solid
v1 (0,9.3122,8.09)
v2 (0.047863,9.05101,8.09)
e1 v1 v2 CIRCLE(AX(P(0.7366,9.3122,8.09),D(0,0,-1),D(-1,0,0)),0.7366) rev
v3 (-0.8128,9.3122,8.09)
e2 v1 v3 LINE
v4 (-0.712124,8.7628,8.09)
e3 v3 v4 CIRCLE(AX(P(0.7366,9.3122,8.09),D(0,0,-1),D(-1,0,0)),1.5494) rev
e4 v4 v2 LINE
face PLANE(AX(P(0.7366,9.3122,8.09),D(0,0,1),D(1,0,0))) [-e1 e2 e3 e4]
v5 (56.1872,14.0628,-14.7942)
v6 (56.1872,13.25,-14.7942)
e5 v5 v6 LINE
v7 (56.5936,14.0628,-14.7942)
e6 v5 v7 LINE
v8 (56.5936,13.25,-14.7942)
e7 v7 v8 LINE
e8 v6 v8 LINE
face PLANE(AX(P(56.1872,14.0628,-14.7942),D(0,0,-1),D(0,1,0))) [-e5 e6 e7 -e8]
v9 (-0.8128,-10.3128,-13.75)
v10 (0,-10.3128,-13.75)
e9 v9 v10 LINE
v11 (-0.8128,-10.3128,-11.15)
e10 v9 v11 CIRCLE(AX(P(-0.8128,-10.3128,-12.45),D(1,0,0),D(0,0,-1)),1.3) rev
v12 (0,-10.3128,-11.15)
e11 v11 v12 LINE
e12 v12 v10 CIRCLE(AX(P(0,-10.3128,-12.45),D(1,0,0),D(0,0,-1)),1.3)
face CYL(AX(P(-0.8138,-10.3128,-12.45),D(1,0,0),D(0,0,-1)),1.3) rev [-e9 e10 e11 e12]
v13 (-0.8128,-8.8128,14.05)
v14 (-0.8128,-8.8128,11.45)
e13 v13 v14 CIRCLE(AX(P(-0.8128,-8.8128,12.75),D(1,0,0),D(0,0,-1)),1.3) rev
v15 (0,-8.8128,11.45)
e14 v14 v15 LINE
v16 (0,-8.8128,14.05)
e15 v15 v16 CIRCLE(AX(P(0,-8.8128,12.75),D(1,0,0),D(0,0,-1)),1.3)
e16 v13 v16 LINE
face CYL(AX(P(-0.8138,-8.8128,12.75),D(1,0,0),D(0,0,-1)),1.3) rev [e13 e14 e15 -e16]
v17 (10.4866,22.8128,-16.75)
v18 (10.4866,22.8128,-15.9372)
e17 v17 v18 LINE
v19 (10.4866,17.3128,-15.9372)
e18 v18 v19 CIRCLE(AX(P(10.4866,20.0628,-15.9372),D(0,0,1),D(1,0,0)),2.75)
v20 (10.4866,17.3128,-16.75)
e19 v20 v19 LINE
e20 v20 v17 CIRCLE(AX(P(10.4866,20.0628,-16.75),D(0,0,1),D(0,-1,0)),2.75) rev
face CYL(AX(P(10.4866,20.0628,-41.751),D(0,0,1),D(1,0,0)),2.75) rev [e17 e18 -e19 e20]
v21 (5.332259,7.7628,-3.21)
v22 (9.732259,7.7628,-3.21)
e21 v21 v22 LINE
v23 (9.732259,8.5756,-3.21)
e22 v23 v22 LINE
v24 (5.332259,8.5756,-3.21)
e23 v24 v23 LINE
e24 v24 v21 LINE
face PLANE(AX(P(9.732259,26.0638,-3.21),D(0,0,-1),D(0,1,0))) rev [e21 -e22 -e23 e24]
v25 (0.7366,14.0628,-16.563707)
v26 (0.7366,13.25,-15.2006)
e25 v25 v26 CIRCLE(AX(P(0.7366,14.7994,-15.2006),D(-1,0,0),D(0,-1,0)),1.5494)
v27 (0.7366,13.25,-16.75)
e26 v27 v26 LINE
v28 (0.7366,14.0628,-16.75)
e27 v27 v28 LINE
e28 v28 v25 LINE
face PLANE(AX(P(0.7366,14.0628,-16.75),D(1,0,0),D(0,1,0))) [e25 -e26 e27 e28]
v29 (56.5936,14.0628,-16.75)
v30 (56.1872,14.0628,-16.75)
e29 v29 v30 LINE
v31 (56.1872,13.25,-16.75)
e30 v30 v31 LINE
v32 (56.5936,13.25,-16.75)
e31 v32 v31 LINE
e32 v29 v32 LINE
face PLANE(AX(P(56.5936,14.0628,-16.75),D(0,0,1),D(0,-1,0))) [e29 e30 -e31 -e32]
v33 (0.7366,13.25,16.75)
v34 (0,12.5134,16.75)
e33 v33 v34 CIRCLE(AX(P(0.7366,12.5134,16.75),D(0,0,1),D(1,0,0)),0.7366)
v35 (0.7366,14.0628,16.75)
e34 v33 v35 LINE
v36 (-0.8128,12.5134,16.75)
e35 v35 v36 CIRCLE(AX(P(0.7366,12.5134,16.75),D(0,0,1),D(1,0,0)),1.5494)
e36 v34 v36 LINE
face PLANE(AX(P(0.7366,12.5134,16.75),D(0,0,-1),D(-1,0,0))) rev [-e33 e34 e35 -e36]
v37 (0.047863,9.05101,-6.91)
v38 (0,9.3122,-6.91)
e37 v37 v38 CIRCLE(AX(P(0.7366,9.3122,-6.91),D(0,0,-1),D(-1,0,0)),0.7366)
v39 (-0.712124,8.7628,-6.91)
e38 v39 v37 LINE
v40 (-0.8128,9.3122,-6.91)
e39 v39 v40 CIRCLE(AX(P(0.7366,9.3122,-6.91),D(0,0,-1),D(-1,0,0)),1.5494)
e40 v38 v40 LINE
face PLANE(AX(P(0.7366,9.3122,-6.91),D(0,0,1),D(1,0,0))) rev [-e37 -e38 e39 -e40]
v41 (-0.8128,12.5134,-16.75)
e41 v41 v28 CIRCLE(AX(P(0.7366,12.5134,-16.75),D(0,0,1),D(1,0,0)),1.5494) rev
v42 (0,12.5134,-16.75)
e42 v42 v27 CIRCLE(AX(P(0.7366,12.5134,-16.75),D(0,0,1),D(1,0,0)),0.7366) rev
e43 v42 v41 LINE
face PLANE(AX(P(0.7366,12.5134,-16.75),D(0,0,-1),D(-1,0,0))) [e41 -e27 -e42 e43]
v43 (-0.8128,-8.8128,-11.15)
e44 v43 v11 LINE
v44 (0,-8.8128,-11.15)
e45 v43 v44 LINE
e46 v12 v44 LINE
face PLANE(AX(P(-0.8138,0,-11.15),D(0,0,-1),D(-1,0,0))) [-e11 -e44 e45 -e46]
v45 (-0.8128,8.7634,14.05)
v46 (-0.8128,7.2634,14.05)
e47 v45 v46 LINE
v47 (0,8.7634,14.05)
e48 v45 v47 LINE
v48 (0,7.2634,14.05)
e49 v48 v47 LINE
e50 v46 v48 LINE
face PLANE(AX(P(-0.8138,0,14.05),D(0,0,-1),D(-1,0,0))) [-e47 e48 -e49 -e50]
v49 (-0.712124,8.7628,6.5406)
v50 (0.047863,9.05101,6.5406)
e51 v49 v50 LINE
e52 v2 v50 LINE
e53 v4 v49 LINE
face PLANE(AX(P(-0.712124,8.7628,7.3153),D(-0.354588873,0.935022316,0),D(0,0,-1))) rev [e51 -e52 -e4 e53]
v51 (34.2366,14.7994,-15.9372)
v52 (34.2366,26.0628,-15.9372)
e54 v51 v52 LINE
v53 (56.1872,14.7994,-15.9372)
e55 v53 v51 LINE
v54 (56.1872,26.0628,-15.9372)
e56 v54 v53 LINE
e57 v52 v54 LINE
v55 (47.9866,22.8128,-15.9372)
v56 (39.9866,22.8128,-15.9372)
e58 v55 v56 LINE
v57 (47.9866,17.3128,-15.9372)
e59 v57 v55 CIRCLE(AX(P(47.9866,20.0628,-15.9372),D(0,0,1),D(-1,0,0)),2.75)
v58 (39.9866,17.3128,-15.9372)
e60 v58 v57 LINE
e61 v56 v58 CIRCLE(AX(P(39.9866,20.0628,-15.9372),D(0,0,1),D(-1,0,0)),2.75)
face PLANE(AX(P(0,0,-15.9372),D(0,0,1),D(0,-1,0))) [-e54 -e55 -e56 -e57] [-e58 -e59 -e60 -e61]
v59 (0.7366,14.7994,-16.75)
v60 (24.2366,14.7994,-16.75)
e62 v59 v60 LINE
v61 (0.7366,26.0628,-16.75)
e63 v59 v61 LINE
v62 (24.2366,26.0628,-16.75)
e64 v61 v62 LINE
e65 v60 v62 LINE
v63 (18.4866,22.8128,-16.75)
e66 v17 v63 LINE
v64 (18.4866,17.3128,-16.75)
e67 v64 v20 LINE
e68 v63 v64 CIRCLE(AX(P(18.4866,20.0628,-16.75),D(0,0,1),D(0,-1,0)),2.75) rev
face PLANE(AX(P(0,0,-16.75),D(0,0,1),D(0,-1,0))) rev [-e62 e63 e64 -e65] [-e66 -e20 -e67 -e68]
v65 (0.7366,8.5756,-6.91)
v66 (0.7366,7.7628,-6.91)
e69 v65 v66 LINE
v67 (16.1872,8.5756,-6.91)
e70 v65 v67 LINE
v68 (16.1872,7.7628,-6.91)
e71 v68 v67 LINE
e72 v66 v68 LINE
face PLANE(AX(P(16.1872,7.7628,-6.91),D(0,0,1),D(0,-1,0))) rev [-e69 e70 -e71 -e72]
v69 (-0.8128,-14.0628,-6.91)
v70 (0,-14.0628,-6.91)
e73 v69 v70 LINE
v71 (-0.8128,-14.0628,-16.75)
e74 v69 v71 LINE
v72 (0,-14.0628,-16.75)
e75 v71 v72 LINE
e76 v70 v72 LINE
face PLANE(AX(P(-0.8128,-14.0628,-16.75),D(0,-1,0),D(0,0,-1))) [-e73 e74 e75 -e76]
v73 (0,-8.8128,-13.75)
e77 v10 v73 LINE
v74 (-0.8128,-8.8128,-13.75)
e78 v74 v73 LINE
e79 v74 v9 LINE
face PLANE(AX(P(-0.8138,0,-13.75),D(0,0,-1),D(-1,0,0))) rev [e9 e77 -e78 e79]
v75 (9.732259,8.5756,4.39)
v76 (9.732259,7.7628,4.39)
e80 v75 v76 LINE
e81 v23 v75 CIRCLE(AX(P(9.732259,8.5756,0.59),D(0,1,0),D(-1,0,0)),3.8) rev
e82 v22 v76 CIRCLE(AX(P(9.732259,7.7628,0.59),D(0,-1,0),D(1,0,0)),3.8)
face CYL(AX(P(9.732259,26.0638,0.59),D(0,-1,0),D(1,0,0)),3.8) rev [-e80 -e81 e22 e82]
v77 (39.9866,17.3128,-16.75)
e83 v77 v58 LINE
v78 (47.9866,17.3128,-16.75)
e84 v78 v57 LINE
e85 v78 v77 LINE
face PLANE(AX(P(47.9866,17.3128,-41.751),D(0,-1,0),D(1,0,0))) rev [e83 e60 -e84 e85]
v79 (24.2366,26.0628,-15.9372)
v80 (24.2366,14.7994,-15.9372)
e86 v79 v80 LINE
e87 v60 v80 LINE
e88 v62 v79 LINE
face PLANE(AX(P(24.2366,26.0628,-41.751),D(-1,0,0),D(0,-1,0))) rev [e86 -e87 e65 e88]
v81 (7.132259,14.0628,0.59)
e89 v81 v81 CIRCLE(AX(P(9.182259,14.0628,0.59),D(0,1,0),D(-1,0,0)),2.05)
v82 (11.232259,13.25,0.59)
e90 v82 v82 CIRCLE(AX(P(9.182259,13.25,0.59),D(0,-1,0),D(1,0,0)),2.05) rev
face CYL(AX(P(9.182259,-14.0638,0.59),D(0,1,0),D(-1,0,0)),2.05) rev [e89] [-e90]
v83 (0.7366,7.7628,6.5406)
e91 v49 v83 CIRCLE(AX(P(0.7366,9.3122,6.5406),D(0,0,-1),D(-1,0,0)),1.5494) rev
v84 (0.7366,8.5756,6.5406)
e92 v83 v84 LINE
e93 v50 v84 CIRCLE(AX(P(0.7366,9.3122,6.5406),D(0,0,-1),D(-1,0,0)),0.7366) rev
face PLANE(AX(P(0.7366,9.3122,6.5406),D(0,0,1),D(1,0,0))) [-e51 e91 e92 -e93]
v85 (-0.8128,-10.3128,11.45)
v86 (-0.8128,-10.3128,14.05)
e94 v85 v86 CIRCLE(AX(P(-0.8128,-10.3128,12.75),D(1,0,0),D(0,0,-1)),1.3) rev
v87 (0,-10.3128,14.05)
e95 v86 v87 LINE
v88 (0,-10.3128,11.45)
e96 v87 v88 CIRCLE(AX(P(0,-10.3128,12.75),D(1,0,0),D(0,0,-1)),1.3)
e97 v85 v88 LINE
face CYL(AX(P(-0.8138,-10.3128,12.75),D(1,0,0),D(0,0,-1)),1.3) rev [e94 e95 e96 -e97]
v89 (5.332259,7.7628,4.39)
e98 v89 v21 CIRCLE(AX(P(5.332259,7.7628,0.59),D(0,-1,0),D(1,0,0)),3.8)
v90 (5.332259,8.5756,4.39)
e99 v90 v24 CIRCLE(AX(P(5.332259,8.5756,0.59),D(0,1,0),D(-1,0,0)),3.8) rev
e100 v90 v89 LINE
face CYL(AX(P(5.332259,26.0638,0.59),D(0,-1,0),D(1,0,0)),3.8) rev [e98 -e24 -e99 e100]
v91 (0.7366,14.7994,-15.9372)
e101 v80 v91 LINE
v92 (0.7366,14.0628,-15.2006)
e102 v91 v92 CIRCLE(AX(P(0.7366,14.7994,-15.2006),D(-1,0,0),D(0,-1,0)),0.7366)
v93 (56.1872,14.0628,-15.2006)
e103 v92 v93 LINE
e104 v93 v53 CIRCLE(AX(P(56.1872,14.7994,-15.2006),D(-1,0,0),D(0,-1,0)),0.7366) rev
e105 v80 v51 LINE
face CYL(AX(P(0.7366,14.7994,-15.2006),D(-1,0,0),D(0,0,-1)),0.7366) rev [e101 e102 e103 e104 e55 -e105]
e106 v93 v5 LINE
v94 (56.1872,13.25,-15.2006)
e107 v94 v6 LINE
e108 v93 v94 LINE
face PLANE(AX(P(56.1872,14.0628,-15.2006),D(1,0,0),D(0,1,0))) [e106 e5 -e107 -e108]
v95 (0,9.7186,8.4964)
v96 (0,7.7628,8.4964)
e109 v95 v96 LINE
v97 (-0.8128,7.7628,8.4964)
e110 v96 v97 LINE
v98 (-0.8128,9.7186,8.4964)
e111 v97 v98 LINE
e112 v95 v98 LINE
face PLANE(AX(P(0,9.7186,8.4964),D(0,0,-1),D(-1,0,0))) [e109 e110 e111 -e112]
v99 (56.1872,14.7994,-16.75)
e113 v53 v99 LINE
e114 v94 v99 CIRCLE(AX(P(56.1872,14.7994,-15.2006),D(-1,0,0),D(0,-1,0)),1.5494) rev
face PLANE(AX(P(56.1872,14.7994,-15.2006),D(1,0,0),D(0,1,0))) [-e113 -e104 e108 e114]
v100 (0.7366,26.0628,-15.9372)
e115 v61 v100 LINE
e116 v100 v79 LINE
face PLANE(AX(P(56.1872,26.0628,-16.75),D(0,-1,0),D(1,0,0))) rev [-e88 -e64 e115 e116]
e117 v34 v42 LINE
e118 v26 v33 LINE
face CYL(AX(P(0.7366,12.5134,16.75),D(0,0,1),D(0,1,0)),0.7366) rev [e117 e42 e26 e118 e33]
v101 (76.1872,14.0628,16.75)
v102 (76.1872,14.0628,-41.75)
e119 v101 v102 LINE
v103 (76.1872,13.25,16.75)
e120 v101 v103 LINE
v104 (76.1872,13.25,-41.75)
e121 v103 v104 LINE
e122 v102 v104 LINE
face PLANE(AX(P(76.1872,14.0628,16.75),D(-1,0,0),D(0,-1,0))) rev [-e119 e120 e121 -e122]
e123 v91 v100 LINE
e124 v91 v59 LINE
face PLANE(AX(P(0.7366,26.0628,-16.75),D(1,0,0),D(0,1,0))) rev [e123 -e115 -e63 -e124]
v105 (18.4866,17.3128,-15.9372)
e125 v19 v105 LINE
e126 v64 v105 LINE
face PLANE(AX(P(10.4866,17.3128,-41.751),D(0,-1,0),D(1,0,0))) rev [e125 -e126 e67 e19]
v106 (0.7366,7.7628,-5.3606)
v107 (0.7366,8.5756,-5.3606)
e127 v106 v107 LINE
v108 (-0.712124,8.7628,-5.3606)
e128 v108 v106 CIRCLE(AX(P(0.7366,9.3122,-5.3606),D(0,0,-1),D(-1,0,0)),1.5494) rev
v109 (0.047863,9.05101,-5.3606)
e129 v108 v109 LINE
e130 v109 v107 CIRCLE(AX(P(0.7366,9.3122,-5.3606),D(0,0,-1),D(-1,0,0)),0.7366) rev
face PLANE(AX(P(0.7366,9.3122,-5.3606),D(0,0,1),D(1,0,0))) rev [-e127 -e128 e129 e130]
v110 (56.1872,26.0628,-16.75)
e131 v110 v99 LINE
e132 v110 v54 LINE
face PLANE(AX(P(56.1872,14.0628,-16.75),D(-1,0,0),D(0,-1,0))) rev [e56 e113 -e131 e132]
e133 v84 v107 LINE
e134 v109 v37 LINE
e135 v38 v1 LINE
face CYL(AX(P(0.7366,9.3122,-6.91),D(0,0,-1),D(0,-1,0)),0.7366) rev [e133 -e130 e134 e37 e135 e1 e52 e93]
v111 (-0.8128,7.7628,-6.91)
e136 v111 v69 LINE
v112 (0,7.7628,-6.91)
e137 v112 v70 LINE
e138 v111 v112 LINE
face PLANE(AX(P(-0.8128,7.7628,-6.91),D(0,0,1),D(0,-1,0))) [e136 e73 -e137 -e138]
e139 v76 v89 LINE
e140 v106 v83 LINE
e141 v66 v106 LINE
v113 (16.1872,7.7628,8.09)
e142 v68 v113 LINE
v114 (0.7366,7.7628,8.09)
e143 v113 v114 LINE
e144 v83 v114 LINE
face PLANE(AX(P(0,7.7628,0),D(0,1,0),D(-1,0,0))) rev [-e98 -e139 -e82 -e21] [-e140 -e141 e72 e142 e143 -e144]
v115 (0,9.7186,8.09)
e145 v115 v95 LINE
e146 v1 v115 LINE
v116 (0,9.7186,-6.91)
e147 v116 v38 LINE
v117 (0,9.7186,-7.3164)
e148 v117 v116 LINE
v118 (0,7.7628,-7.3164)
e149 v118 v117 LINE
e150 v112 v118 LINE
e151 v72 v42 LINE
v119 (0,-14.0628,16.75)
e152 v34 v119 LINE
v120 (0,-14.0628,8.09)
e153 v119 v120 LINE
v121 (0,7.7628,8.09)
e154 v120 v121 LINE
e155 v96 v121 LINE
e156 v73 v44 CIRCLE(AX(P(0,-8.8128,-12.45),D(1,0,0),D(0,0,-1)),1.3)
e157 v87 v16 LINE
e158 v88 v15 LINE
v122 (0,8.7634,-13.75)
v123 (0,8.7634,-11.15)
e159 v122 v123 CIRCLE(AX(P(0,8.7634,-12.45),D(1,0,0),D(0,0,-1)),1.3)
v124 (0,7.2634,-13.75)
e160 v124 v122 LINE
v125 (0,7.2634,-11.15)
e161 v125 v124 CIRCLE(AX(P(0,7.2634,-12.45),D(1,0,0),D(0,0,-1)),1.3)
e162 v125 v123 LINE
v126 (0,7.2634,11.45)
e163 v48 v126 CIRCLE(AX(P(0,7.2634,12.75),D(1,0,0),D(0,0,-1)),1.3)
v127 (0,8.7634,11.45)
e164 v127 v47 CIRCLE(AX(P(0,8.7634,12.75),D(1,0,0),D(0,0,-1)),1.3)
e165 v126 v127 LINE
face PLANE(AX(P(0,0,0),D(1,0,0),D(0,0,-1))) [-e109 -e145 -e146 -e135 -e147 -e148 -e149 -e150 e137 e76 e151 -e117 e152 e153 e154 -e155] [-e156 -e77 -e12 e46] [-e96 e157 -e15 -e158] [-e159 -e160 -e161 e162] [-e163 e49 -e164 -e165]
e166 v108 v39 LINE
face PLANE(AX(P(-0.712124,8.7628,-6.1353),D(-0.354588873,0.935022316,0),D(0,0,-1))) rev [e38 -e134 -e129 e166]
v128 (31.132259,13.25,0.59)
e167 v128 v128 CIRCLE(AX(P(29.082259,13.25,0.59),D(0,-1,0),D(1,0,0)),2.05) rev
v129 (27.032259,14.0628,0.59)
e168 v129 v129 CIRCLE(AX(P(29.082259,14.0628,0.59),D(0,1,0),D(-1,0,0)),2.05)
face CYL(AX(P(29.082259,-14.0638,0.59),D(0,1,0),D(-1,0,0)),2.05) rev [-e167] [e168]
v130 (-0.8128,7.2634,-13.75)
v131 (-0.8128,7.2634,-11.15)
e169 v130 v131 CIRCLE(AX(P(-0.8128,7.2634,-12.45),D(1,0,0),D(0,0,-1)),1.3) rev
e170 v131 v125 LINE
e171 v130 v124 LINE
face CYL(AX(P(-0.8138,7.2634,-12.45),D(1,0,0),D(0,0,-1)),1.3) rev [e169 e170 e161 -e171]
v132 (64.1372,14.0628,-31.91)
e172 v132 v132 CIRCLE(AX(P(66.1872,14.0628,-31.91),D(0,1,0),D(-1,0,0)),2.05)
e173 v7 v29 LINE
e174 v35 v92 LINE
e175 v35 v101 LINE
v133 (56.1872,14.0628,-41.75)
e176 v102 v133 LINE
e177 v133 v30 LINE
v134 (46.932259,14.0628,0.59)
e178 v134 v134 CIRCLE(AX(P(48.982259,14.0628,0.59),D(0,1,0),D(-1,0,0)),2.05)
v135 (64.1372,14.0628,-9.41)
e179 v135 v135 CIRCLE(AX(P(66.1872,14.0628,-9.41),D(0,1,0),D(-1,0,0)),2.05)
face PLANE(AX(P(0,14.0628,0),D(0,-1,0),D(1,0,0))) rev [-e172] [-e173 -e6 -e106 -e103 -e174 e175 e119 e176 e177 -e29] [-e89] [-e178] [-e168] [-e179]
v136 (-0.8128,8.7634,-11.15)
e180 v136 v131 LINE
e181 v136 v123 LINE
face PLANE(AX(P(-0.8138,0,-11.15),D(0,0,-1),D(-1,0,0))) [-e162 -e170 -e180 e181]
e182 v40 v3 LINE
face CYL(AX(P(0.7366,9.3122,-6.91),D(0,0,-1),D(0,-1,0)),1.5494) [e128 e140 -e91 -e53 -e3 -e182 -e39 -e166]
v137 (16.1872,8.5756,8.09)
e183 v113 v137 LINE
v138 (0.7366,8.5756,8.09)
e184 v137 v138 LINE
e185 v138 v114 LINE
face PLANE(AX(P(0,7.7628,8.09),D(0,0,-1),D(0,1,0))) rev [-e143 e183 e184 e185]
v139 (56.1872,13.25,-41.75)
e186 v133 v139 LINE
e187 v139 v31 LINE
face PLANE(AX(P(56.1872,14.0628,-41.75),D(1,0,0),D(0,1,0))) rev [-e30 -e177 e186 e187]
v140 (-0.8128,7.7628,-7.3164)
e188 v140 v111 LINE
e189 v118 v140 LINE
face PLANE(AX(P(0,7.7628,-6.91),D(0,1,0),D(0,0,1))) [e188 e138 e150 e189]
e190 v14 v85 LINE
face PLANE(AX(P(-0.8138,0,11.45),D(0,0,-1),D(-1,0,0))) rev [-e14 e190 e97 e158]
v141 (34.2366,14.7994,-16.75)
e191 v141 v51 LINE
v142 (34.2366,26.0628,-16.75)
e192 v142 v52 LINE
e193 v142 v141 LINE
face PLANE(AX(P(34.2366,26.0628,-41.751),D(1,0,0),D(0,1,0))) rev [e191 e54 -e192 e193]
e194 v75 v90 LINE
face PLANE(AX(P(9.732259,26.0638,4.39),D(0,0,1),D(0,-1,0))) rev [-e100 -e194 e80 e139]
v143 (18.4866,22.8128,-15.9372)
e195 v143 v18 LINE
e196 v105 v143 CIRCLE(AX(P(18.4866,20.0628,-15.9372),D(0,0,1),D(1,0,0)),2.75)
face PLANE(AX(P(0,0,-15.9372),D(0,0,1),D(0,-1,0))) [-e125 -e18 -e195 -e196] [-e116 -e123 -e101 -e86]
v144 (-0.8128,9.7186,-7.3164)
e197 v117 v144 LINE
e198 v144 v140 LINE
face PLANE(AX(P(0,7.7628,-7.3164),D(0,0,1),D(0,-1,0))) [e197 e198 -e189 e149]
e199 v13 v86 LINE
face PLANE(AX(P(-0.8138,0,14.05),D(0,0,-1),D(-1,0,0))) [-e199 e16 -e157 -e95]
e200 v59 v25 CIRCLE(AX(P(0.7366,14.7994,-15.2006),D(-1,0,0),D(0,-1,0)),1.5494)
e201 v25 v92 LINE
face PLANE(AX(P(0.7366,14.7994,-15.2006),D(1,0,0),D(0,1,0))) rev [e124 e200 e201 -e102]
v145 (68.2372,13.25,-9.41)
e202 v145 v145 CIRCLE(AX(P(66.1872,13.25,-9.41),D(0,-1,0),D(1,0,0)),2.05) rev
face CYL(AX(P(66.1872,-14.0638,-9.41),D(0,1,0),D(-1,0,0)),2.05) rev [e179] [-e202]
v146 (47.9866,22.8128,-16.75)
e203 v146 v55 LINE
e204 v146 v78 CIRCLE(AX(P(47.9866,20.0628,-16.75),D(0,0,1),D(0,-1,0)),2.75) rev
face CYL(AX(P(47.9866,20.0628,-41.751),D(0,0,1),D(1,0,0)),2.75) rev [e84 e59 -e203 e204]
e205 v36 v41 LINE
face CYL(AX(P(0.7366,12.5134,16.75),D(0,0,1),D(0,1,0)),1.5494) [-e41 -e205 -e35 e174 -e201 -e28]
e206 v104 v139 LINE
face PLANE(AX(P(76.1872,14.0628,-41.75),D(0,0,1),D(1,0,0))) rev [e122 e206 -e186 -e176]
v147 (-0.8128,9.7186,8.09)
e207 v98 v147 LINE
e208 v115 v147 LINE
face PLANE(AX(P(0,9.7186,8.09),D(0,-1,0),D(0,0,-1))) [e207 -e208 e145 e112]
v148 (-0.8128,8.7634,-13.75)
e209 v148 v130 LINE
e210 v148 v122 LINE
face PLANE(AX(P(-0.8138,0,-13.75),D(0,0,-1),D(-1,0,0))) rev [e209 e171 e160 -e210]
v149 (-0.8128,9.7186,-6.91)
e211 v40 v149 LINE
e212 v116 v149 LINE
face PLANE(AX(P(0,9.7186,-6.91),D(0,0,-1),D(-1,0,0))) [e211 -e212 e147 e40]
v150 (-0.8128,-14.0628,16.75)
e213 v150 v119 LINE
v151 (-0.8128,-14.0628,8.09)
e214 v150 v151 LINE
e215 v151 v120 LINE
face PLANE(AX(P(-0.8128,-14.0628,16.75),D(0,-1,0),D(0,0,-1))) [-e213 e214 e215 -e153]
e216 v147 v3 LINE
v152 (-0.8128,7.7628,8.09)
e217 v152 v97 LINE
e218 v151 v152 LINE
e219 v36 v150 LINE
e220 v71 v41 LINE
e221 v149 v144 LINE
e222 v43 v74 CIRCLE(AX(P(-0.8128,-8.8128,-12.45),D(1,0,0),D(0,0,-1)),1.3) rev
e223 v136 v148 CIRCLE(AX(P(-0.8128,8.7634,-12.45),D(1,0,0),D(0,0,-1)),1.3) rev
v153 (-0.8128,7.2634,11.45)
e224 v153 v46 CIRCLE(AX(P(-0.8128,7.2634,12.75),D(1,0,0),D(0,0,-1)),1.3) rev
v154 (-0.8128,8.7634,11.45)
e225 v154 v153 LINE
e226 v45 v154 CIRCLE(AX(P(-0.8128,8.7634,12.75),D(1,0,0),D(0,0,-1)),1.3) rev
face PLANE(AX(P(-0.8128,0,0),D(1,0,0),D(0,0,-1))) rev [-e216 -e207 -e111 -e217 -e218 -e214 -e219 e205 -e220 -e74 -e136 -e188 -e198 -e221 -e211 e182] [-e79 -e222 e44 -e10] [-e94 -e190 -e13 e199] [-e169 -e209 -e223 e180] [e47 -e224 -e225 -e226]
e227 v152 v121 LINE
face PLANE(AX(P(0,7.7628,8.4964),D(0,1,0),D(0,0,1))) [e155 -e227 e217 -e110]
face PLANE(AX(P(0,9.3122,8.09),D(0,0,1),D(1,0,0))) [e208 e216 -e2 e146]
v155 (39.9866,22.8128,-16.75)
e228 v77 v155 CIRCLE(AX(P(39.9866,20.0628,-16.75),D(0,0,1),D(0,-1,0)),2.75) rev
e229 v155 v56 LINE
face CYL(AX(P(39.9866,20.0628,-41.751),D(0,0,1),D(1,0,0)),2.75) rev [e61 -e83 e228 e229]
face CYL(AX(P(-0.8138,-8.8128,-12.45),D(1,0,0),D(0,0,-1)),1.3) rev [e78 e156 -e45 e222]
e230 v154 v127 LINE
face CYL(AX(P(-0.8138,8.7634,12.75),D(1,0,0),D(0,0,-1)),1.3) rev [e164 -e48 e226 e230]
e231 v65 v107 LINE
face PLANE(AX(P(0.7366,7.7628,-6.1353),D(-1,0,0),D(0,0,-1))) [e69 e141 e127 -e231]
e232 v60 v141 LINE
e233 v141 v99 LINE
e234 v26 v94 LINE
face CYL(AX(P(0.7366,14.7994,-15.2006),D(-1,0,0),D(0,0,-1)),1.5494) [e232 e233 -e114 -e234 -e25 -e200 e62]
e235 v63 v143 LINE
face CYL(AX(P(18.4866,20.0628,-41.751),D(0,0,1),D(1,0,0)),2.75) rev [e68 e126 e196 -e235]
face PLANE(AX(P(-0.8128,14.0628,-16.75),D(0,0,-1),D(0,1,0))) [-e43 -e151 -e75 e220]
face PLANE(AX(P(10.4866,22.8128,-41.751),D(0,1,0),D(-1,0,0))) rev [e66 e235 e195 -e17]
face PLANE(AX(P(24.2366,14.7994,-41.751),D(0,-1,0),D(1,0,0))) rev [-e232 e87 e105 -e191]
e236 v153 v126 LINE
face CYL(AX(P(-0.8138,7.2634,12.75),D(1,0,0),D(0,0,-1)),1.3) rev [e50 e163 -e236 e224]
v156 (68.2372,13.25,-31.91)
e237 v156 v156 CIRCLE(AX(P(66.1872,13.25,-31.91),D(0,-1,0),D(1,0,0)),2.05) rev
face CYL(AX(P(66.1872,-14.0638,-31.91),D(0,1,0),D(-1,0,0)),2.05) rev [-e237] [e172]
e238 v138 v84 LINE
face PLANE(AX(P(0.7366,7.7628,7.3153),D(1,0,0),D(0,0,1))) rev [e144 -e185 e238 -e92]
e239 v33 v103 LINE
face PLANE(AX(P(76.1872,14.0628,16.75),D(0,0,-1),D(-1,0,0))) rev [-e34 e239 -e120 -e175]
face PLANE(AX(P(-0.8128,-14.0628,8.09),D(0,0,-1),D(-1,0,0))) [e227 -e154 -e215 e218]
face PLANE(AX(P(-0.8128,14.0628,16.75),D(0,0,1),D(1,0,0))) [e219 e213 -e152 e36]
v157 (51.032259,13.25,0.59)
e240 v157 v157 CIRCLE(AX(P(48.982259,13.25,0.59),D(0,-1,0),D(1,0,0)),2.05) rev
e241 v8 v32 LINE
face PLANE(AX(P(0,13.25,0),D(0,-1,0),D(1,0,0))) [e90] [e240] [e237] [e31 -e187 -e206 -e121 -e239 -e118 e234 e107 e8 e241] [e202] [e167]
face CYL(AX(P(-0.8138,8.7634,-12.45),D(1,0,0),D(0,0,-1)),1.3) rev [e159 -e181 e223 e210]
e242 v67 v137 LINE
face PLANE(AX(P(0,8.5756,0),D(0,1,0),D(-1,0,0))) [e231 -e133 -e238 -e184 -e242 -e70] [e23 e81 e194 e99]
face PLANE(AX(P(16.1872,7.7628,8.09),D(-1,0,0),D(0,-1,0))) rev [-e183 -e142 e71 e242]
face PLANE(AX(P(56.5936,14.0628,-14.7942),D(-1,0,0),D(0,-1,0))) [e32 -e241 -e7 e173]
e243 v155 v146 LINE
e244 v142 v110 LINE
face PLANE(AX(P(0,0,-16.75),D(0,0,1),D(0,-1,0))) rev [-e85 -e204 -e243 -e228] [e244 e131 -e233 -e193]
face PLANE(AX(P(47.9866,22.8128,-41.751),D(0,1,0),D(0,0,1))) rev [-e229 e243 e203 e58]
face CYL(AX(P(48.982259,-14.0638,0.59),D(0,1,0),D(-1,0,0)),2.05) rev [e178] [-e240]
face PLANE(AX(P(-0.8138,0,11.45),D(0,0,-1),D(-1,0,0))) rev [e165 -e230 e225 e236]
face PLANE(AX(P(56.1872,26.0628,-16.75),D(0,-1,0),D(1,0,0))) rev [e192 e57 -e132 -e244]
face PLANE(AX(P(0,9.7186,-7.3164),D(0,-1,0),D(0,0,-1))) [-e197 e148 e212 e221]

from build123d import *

# Parameters (mm, degrees)
BASE_FLANGE2_DEPTH           = 0.8128
EDGE_FLANGE1_STRIP_W         = 4.7244
EDGE_FLANGE1_STRIP_H         = 0.8128
EDGE_FLANGE1_STRIP_CUT_DEPTH = 33.5
EDGE_FLANGE1_DEPTH           = 33.5
EDGE_FLANGE1_FLAT_DEPTH      = 0.8128
EDGE_FLANGE3_START           = 0.7366
EDGE_FLANGE3_DEPTH           = 55.857
EDGE_FLANGE3_START_2         = 56.1872
EDGE_FLANGE3_2_DEPTH         = 0.4064
EDGE_FLANGE3_3_DEPTH         = 55.4506
CUT_EXTRUDE1_REACH           = 93.316
SKETCH21_R                   = 2.05
CUT_EXTRUDE2_REACH           = 88.903
SKETCH22_W                   = 10
SKETCH22_H                   = 11.2634
EDGE_FLANGE4_START           = -7.3164
EDGE_FLANGE4_DEPTH           = 15.8128
EDGE_FLANGE4_2_DEPTH         = 0.4064
EDGE_FLANGE4_START_2         = 8.09
EDGE_FLANGE4_3_DEPTH         = 0.4064
EDGE_FLANGE4_START_3         = -6.91
EDGE_FLANGE4_4_DEPTH         = 15
CUT_EXTRUDE3_REACH           = 91.576
CUT_EXTRUDE4_REACH           = 92.702
CUT_EXTRUDE6_START           = 6.5406
CUT_EXTRUDE6_DEPTH           = 1.5494


# Read off the part's stored shape, not the designer's step: Edge-Flange3, Edge-Flange4, Cut-Extrude6
# Sheet-metal steps are written as plain solids
with BuildPart() as part:
    # Sketch7 → Base-Flange2 (new body)
    with BuildSketch(Plane.YZ):
        Polygon((-14.0628, 8.09), (7.7628, 8.09), (7.7628, -6.91), (-14.0628, -6.91), (-14.0628, -16.75), (14.0628, -16.75), (14.0628, 16.75), (-14.0628, 16.75), align=None)
    extrude(amount=-BASE_FLANGE2_DEPTH)

    # Edge-Flange1 strip (across the edge) → Edge-Flange1 strip cut (cut)
    with BuildSketch(Plane(origin=(0, 14.0628, -16.75), x_dir=(0, -1, 0), z_dir=(0, 0, 1))):
        with Locations((-0.8128, -0.4064)):
            Rectangle(EDGE_FLANGE1_STRIP_W, EDGE_FLANGE1_STRIP_H)
    extrude(amount=EDGE_FLANGE1_STRIP_CUT_DEPTH, mode=Mode.SUBTRACT)

    # Edge-Flange1 bend section (across the edge) → Edge-Flange1 (add)
    with BuildSketch(Plane(origin=(0, 14.0628, -16.75), x_dir=(0, -1, 0), z_dir=(0, 0, 1))):
        with BuildLine():
            Line((0, 0.7366), (0.8128, 0.7366))
            ThreePointArc((0.8128, 0.7366), (1.028545145, 0.215745145), (1.5494, 0))
            Line((1.5494, 0), (1.5494, -0.8128))
            ThreePointArc((1.5494, -0.8128), (0.453808753, -0.358991247), (0, 0.7366))
        make_face()
    extrude(amount=EDGE_FLANGE1_DEPTH)

    # Edge-Flange1 profile (on flange) → Edge-Flange1 flat (add)
    with BuildSketch(Plane.ZX.offset(14.0628)):
        Polygon((-41.75, 56.1872), (-16.75, 56.1872), (-16.75, 0.7366), (16.75, 0.7366), (16.75, 76.1872), (-41.75, 76.1872), align=None)
    extrude(amount=-EDGE_FLANGE1_FLAT_DEPTH)

    # Edge-Flange3 outline → Edge-Flange3 (cut)
    with BuildSketch(Plane.YZ.offset(EDGE_FLANGE3_START)):
        with BuildLine():
            Line((14.0628, -16.75), (14.0628, -16.563707039))
            ThreePointArc((14.0628, -16.563707039), (13.468624211, -15.994121367), (13.25, -15.2006))
            Line((13.25, -15.2006), (13.25, -16.75))
            Line((13.25, -16.75), (14.0628, -16.75))
        make_face()
    extrude(amount=EDGE_FLANGE3_DEPTH, mode=Mode.SUBTRACT)

    # Edge-Flange3 2 outline → Edge-Flange3 2 (cut)
    with BuildSketch(Plane.YZ.offset(EDGE_FLANGE3_START_2)):
        with BuildLine():
            ThreePointArc((13.25, -15.2006), (13.468624211, -15.994121367), (14.0628, -16.563707039))
            Line((14.0628, -16.563707039), (14.0628, -14.7942))
            Line((14.0628, -14.7942), (13.25, -14.7942))
            Line((13.25, -14.7942), (13.25, -15.2006))
        make_face()
    extrude(amount=EDGE_FLANGE3_2_DEPTH, mode=Mode.SUBTRACT)

    # Edge-Flange3 3 outline → Edge-Flange3 3 (add)
    with BuildSketch(Plane.YZ.offset(EDGE_FLANGE3_START)):
        with BuildLine():
            Line((14.7994, -16.75), (26.0628, -16.75))
            Line((26.0628, -16.75), (26.0628, -15.9372))
            Line((26.0628, -15.9372), (14.7994, -15.9372))
            ThreePointArc((14.7994, -15.9372), (14.278545145, -15.721454855), (14.0628, -15.2006))
            Line((14.0628, -15.2006), (14.0628, -16.563707039))
            ThreePointArc((14.0628, -16.563707039), (14.419503755, -16.702704924), (14.7994, -16.75))
        make_face()
    extrude(amount=EDGE_FLANGE3_3_DEPTH)

    # Sketch21 → Cut-Extrude1 (cut, up to next)
    with BuildSketch(Plane(origin=(0, 14.0628, 0), x_dir=(-1, 0, 0), z_dir=(0, 1, 0)), mode=Mode.PRIVATE) as cut_extrude1_sk1:
        with Locations((-66.1872, -31.91)):
            Circle(SKETCH21_R)
    cut_extrude1_tool1 = extrude(cut_extrude1_sk1.sketch, amount=-CUT_EXTRUDE1_REACH, mode=Mode.PRIVATE) & part.part
    # Sketch21 → Cut-Extrude1 (cut, up to next)
    with BuildSketch(Plane(origin=(0, 14.0628, 0), x_dir=(-1, 0, 0), z_dir=(0, 1, 0)), mode=Mode.PRIVATE) as cut_extrude1_sk2:
        with Locations((-66.1872, -9.41)):
            Circle(SKETCH21_R)
    cut_extrude1_tool2 = extrude(cut_extrude1_sk2.sketch, amount=-CUT_EXTRUDE1_REACH, mode=Mode.PRIVATE) & part.part
    # Sketch21 → Cut-Extrude1 (cut, up to next)
    with BuildSketch(Plane(origin=(0, 14.0628, 0), x_dir=(-1, 0, 0), z_dir=(0, 1, 0)), mode=Mode.PRIVATE) as cut_extrude1_sk3:
        with Locations((-48.982258849, 0.59)):
            Circle(SKETCH21_R)
    cut_extrude1_tool3 = extrude(cut_extrude1_sk3.sketch, amount=-CUT_EXTRUDE1_REACH, mode=Mode.PRIVATE) & part.part
    # Sketch21 → Cut-Extrude1 (cut, up to next)
    with BuildSketch(Plane(origin=(0, 14.0628, 0), x_dir=(-1, 0, 0), z_dir=(0, 1, 0)), mode=Mode.PRIVATE) as cut_extrude1_sk4:
        with Locations((-29.082258849, 0.59)):
            Circle(SKETCH21_R)
    cut_extrude1_tool4 = extrude(cut_extrude1_sk4.sketch, amount=-CUT_EXTRUDE1_REACH, mode=Mode.PRIVATE) & part.part
    # Sketch21 → Cut-Extrude1 (cut, up to next)
    with BuildSketch(Plane(origin=(0, 14.0628, 0), x_dir=(-1, 0, 0), z_dir=(0, 1, 0)), mode=Mode.PRIVATE) as cut_extrude1_sk5:
        with Locations((-9.182258849, 0.59)):
            Circle(SKETCH21_R)
    cut_extrude1_tool5 = extrude(cut_extrude1_sk5.sketch, amount=-CUT_EXTRUDE1_REACH, mode=Mode.PRIVATE) & part.part
    add(cut_extrude1_tool1.solids().sort_by_distance((66.1872, 14.0628, -31.91))[0], mode=Mode.SUBTRACT)
    add(cut_extrude1_tool2.solids().sort_by_distance((66.1872, 14.0628, -9.41))[0], mode=Mode.SUBTRACT)
    add(cut_extrude1_tool3.solids().sort_by_distance((48.982259, 14.0628, 0.59))[0], mode=Mode.SUBTRACT)
    add(cut_extrude1_tool4.solids().sort_by_distance((29.082259, 14.0628, 0.59))[0], mode=Mode.SUBTRACT)
    add(cut_extrude1_tool5.solids().sort_by_distance((9.182259, 14.0628, 0.59))[0], mode=Mode.SUBTRACT)

    # Sketch22 → Cut-Extrude2 (cut, up to next)
    with BuildSketch(Plane.XY.offset(-15.9372), mode=Mode.PRIVATE) as cut_extrude2_sk1:
        with BuildLine():
            Line((10.4866, 22.8128), (18.4866, 22.8128))
            ThreePointArc((18.4866, 22.8128), (21.2366, 20.0628), (18.4866, 17.3128))
            Line((18.4866, 17.3128), (10.4866, 17.3128))
            ThreePointArc((10.4866, 17.3128), (7.7366, 20.0628), (10.4866, 22.8128))
        make_face()
    cut_extrude2_tool1 = extrude(cut_extrude2_sk1.sketch, amount=-CUT_EXTRUDE2_REACH, mode=Mode.PRIVATE) & part.part
    # Sketch22 → Cut-Extrude2 (cut, up to next)
    with BuildSketch(Plane.XY.offset(-15.9372), mode=Mode.PRIVATE) as cut_extrude2_sk2:
        with BuildLine():
            Line((47.9866, 22.8128), (39.9866, 22.8128))
            ThreePointArc((39.9866, 22.8128), (37.2366, 20.0628), (39.9866, 17.3128))
            Line((39.9866, 17.3128), (47.9866, 17.3128))
            ThreePointArc((47.9866, 17.3128), (50.7366, 20.0628), (47.9866, 22.8128))
        make_face()
    cut_extrude2_tool2 = extrude(cut_extrude2_sk2.sketch, amount=-CUT_EXTRUDE2_REACH, mode=Mode.PRIVATE) & part.part
    # Sketch22 → Cut-Extrude2 (cut, up to next)
    with BuildSketch(Plane.XY.offset(-15.9372), mode=Mode.PRIVATE) as cut_extrude2_sk3:
        with Locations((29.2366, 20.4311)):
            Rectangle(SKETCH22_W, SKETCH22_H)
    cut_extrude2_tool3 = extrude(cut_extrude2_sk3.sketch, amount=-CUT_EXTRUDE2_REACH, mode=Mode.PRIVATE) & part.part
    add(cut_extrude2_tool1.solids().sort_by_distance((14.4866, 20.0628, -15.9372))[0], mode=Mode.SUBTRACT)
    add(cut_extrude2_tool2.solids().sort_by_distance((43.9866, 20.0628, -15.9372))[0], mode=Mode.SUBTRACT)
    add(cut_extrude2_tool3.solids().sort_by_distance((29.2366, 20.4311, -15.9372))[0], mode=Mode.SUBTRACT)

    # Edge-Flange4 outline → Edge-Flange4 (cut)
    with BuildSketch(Plane.XY.offset(EDGE_FLANGE4_START)):
        with BuildLine():
            ThreePointArc((0, 7.949092961), (-0.594175789, 8.518678633), (-0.8128, 9.3122))
            Line((-0.8128, 9.3122), (-0.8128, 7.7628))
            Line((-0.8128, 7.7628), (0, 7.7628))
            Line((0, 7.7628), (0, 7.949092961))
        make_face()
    extrude(amount=EDGE_FLANGE4_DEPTH, mode=Mode.SUBTRACT)

    # Edge-Flange4 2 outline → Edge-Flange4 2 (cut)
    with BuildSketch(Plane.XY.offset(EDGE_FLANGE4_START)):
        with BuildLine():
            Line((0, 9.7186), (-0.8128, 9.7186))
            Line((-0.8128, 9.7186), (-0.8128, 9.3122))
            ThreePointArc((-0.8128, 9.3122), (-0.594175789, 8.518678633), (0, 7.949092961))
            Line((0, 7.949092961), (0, 9.7186))
        make_face()
    extrude(amount=EDGE_FLANGE4_2_DEPTH, mode=Mode.SUBTRACT)

    # Edge-Flange4 3 outline → Edge-Flange4 3 (cut)
    with BuildSketch(Plane.XY.offset(EDGE_FLANGE4_START_2)):
        with BuildLine():
            Line((0, 9.7186), (-0.8128, 9.7186))
            Line((-0.8128, 9.7186), (-0.8128, 9.3122))
            ThreePointArc((-0.8128, 9.3122), (-0.594175789, 8.518678633), (0, 7.949092961))
            Line((0, 7.949092961), (0, 9.7186))
        make_face()
    extrude(amount=EDGE_FLANGE4_3_DEPTH, mode=Mode.SUBTRACT)

    # Edge-Flange4 4 outline → Edge-Flange4 4 (add)
    with BuildSketch(Plane.XY.offset(EDGE_FLANGE4_START_3)):
        with BuildLine():
            ThreePointArc((0.7366, 8.5756), (0.215745145, 8.791345145), (0, 9.3122))
            Line((0, 9.3122), (0, 7.949092961))
            ThreePointArc((0, 7.949092961), (0.356703755, 7.810095076), (0.7366, 7.7628))
            Line((0.7366, 7.7628), (16.1872, 7.7628))
            Line((16.1872, 7.7628), (16.1872, 8.5756))
            Line((16.1872, 8.5756), (0.7366, 8.5756))
        make_face()
    extrude(amount=EDGE_FLANGE4_4_DEPTH)

    # Sketch27 → Cut-Extrude3 (cut, up to next)
    with BuildSketch(Plane.XZ.offset(-7.7628), mode=Mode.PRIVATE) as cut_extrude3_sk1:
        with BuildLine():
            Line((9.732258849, -3.21), (5.332258849, -3.21))
            ThreePointArc((5.332258849, -3.21), (1.532258849, 0.59), (5.332258849, 4.39))
            Line((5.332258849, 4.39), (9.732258849, 4.39))
            ThreePointArc((9.732258849, 4.39), (13.532258849, 0.59), (9.732258849, -3.21))
        make_face()
    cut_extrude3_tool1 = extrude(cut_extrude3_sk1.sketch, amount=-CUT_EXTRUDE3_REACH, mode=Mode.PRIVATE) & part.part
    add(cut_extrude3_tool1.solids().sort_by_distance((7.532259, 7.7628, 0.59))[0], mode=Mode.SUBTRACT)

    # Sketch33 → Cut-Extrude4 (cut, up to next)
    with BuildSketch(Plane.YZ, mode=Mode.PRIVATE) as cut_extrude4_sk1:
        with BuildLine():
            Line((-10.3128, -13.75), (-8.8128, -13.75))
            ThreePointArc((-8.8128, -13.75), (-7.5128, -12.45), (-8.8128, -11.15))
            Line((-8.8128, -11.15), (-10.3128, -11.15))
            ThreePointArc((-10.3128, -11.15), (-11.6128, -12.45), (-10.3128, -13.75))
        make_face()
    cut_extrude4_tool1 = extrude(cut_extrude4_sk1.sketch, amount=-CUT_EXTRUDE4_REACH, mode=Mode.PRIVATE) & part.part
    # Sketch33 → Cut-Extrude4 (cut, up to next)
    with BuildSketch(Plane.YZ, mode=Mode.PRIVATE) as cut_extrude4_sk2:
        with BuildLine():
            Line((7.2634, -13.75), (8.7634, -13.75))
            ThreePointArc((8.7634, -13.75), (10.0634, -12.45), (8.7634, -11.15))
            Line((8.7634, -11.15), (7.2634, -11.15))
            ThreePointArc((7.2634, -11.15), (5.9634, -12.45), (7.2634, -13.75))
        make_face()
    cut_extrude4_tool2 = extrude(cut_extrude4_sk2.sketch, amount=-CUT_EXTRUDE4_REACH, mode=Mode.PRIVATE) & part.part
    # Sketch33 → Cut-Extrude4 (cut, up to next)
    with BuildSketch(Plane.YZ, mode=Mode.PRIVATE) as cut_extrude4_sk3:
        with BuildLine():
            Line((-10.3128, 11.45), (-8.8128, 11.45))
            ThreePointArc((-8.8128, 11.45), (-7.5128, 12.75), (-8.8128, 14.05))
            Line((-8.8128, 14.05), (-10.3128, 14.05))
            ThreePointArc((-10.3128, 14.05), (-11.6128, 12.75), (-10.3128, 11.45))
        make_face()
    cut_extrude4_tool3 = extrude(cut_extrude4_sk3.sketch, amount=-CUT_EXTRUDE4_REACH, mode=Mode.PRIVATE) & part.part
    # Sketch33 → Cut-Extrude4 (cut, up to next)
    with BuildSketch(Plane.YZ, mode=Mode.PRIVATE) as cut_extrude4_sk4:
        with BuildLine():
            Line((7.2634, 11.45), (8.7634, 11.45))
            ThreePointArc((8.7634, 11.45), (10.0634, 12.75), (8.7634, 14.05))
            Line((8.7634, 14.05), (7.2634, 14.05))
            ThreePointArc((7.2634, 14.05), (5.9634, 12.75), (7.2634, 11.45))
        make_face()
    cut_extrude4_tool4 = extrude(cut_extrude4_sk4.sketch, amount=-CUT_EXTRUDE4_REACH, mode=Mode.PRIVATE) & part.part
    add(cut_extrude4_tool1.solids().sort_by_distance((0, -9.5628, -12.45))[0], mode=Mode.SUBTRACT)
    add(cut_extrude4_tool2.solids().sort_by_distance((0, 8.0134, -12.45))[0], mode=Mode.SUBTRACT)
    add(cut_extrude4_tool3.solids().sort_by_distance((0, -9.5628, 12.75))[0], mode=Mode.SUBTRACT)
    add(cut_extrude4_tool4.solids().sort_by_distance((0, 8.0134, 12.75))[0], mode=Mode.SUBTRACT)

    # Cut-Extrude6 outline → Cut-Extrude6 (cut)
    with BuildSketch(Plane.XY.offset(CUT_EXTRUDE6_START)):
        with BuildLine():
            ThreePointArc((-0.712123576, 8.7628), (-0.143570438, 8.037076335), (0.7366, 7.7628))
            Line((0.7366, 7.7628), (0.7366, 8.5756))
            ThreePointArc((0.7366, 8.5756), (0.318158316, 8.705993668), (0.047862562, 9.051009836))
            Line((0.047862562, 9.051009836), (-0.712123576, 8.7628))
        make_face()
    cut_extrude6 = extrude(amount=CUT_EXTRUDE6_DEPTH, mode=Mode.SUBTRACT)

    # Mirror1: Cut-Extrude6 across plane
    add(cut_extrude6.mirror(Plane.XY.offset(0.59)), mode=Mode.SUBTRACT)


solid = part.part
